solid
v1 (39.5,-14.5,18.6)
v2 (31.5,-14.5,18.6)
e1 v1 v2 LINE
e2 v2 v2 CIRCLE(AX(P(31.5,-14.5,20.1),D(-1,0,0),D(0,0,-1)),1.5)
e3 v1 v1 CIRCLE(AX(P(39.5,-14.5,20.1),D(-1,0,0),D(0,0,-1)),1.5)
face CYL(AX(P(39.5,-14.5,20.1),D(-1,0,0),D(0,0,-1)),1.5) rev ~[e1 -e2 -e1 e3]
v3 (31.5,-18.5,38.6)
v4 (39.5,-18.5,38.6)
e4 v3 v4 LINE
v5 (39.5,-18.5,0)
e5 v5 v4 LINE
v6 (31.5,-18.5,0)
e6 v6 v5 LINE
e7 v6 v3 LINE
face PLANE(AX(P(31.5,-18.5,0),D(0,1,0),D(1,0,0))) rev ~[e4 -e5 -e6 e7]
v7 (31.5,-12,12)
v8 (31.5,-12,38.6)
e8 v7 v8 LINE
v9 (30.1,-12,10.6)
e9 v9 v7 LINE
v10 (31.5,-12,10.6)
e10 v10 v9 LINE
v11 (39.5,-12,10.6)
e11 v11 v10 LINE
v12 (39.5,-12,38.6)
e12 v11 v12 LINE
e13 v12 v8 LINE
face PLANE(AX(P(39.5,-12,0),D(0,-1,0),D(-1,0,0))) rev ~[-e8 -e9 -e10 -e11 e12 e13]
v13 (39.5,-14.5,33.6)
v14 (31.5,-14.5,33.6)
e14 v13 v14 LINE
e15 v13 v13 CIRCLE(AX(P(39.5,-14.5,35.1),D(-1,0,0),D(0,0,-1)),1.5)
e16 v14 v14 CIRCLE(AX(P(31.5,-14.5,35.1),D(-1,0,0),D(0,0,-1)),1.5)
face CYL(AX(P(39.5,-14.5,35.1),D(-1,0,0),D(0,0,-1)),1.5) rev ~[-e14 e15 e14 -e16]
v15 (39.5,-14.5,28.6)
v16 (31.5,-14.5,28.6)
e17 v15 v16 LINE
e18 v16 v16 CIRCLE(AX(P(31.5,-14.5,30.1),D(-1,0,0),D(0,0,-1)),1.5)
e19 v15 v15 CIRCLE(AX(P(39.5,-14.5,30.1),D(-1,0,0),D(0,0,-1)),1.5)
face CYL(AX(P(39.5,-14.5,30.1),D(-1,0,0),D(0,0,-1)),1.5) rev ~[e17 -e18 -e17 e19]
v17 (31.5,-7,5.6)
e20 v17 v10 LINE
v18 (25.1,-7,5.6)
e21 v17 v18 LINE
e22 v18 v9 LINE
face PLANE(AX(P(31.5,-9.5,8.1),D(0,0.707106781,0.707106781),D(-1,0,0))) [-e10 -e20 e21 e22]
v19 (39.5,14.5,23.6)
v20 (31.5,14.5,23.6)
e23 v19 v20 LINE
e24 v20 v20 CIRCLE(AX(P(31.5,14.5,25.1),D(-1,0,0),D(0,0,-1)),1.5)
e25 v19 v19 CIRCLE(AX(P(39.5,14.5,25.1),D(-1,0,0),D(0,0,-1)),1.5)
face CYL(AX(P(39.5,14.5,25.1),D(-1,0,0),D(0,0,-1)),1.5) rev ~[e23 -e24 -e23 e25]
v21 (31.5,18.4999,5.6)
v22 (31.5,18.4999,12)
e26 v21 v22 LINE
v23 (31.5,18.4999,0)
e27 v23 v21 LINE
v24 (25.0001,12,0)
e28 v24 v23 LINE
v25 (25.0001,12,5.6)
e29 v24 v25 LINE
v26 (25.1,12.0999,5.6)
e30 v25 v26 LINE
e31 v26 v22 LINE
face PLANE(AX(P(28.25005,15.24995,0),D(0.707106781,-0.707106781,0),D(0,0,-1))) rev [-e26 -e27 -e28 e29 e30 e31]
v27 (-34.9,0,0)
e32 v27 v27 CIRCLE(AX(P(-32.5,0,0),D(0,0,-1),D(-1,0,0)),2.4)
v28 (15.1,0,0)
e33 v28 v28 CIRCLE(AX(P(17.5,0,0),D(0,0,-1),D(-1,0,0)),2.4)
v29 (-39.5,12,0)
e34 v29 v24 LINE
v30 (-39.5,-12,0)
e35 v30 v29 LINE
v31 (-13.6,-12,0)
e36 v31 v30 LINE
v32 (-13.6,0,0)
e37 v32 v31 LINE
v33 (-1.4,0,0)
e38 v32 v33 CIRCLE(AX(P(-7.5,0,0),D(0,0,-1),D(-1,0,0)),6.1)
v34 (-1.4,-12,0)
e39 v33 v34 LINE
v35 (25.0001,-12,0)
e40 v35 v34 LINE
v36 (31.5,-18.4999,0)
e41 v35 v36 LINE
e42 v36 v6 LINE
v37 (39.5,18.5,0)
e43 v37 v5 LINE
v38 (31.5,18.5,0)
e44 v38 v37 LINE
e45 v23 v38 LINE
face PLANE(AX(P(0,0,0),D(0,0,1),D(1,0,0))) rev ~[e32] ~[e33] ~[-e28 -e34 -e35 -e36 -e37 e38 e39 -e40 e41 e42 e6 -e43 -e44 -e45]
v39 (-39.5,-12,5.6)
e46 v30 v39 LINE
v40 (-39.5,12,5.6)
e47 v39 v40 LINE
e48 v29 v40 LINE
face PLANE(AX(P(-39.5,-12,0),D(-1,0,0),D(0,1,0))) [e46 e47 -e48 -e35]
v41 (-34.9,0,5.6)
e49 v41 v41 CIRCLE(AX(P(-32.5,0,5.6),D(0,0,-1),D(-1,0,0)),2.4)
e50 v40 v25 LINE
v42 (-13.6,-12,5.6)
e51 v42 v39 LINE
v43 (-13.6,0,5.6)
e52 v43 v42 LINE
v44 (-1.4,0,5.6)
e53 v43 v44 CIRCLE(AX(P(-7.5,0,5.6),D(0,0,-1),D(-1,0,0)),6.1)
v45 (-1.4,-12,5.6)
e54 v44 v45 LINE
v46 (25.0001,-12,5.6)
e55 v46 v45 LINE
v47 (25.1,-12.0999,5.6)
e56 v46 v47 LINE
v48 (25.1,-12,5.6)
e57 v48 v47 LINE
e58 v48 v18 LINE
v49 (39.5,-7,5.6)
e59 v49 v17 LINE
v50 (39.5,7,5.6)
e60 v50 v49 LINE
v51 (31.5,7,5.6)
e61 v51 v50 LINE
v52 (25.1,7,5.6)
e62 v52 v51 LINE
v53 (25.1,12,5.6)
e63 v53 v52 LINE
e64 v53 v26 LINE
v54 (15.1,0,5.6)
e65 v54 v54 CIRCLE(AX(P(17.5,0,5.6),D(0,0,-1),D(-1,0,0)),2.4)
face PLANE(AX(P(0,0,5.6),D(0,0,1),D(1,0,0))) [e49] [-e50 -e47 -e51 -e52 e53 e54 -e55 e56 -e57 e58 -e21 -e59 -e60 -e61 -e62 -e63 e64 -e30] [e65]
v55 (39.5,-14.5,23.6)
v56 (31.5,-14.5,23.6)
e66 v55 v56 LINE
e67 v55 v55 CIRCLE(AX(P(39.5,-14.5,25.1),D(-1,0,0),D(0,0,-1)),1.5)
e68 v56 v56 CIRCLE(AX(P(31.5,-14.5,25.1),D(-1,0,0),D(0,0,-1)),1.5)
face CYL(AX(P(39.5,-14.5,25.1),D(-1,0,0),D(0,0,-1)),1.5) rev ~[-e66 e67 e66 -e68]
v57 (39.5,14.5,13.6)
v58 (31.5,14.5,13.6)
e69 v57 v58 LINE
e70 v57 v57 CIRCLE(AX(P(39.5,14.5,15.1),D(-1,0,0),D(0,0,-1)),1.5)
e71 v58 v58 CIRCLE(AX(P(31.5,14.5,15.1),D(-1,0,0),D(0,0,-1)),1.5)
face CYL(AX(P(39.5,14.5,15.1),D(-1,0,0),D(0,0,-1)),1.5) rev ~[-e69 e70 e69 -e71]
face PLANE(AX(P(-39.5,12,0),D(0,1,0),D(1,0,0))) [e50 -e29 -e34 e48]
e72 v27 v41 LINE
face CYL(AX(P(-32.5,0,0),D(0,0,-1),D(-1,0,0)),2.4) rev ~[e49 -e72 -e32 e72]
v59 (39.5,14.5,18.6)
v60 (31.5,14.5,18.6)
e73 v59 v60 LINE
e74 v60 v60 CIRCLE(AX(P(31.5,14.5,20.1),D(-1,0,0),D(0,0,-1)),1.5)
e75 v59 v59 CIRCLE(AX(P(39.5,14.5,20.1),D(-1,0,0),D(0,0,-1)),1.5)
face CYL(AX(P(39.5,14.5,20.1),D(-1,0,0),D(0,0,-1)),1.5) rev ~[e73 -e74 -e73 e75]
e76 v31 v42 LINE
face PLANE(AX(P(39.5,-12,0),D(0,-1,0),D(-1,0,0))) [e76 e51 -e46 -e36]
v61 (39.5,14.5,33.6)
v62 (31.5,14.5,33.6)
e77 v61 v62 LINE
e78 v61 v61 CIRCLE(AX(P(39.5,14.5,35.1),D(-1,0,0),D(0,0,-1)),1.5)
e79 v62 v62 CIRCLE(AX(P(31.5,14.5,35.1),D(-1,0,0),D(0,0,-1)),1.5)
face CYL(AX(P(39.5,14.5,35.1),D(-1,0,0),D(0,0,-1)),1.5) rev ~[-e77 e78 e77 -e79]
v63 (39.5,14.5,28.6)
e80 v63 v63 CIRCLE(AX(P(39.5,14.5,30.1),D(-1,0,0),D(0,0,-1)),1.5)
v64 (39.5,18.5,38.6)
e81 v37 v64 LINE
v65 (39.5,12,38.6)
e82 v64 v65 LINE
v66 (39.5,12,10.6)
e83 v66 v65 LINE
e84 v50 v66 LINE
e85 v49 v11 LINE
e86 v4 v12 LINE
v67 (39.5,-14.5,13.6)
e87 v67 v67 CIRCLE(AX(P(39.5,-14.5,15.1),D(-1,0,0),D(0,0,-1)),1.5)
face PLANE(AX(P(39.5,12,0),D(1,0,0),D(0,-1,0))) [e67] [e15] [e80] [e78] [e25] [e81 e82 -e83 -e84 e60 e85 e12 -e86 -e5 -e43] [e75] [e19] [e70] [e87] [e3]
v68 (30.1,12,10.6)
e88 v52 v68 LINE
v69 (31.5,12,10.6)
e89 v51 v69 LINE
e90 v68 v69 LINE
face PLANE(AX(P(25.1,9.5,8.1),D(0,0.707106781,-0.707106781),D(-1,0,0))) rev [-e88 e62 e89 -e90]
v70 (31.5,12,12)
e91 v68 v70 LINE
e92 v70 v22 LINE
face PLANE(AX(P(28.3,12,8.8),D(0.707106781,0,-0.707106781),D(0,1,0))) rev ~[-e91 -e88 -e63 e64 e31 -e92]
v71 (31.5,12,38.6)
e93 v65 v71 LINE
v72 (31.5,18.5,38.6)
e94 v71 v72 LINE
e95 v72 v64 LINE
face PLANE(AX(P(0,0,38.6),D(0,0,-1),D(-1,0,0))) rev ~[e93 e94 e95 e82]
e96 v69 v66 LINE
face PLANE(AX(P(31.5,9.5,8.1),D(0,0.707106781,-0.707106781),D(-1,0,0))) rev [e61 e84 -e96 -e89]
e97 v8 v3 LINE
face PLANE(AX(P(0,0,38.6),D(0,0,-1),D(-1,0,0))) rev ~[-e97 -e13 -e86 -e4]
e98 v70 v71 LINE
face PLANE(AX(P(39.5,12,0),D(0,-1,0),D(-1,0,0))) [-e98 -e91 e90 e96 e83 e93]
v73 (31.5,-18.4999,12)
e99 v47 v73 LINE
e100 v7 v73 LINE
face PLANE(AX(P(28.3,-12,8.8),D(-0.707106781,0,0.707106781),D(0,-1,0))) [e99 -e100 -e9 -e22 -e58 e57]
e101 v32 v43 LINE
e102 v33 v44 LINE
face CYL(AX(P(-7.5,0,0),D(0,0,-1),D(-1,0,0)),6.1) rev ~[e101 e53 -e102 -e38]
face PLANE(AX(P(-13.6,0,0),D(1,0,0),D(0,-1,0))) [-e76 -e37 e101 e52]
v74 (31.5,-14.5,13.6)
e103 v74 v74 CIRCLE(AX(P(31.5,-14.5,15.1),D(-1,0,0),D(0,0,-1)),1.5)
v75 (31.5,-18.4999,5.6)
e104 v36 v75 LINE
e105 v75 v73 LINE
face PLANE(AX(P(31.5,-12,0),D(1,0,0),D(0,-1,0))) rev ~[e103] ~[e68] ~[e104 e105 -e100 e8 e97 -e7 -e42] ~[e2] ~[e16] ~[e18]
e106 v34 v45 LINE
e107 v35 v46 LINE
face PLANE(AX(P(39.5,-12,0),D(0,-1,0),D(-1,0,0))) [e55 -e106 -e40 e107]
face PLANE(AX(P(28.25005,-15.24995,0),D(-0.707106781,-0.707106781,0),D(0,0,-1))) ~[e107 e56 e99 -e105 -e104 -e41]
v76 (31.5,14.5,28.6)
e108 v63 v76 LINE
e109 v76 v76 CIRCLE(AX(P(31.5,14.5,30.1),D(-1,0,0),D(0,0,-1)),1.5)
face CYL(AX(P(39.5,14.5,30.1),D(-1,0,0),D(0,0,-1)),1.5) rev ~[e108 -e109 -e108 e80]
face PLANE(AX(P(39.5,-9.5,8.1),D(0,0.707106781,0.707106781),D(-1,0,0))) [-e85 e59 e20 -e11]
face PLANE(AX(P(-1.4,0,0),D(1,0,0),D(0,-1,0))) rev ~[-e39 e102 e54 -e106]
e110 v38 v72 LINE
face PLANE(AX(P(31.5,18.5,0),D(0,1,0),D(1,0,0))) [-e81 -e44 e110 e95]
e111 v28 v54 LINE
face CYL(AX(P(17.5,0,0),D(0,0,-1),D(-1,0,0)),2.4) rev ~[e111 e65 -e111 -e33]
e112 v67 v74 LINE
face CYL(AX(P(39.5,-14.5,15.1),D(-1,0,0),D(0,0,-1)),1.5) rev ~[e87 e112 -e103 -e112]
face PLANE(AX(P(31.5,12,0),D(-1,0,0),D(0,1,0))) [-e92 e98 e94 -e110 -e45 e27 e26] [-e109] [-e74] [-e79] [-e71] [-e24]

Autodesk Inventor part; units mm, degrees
ref_plane "YZ Plane" through (0, 0, 0) normal (1, 0, 0) x (0, 1, 0)
ref_plane "XZ Plane" through (0, 0, 0) normal (0, 1, 0) x (-1, 0, 0)
ref_plane "XY Plane" through (0, 0, 0) normal (0, 0, 1) x (1, 0, 0)
sketch "Sketch1" plane through (0, 0, 0) normal (0, 0, 1) x (1, 0, 0)
  line L0 (-39.5, 12) -> (39.5, 12)
  line L1 (39.5, 12) -> (39.5, -12)
  line L2 (39.5, -12) -> (-39.5, -12)
  line L3 (-39.5, -12) -> (-39.5, 12)
  line L4 (-39.5, 12) -> (39.5, -12) construction
  line L5 (39.5, 12) -> (-39.5, -12) construction
  point P0 (0, 0)
  dimension "d0" = 79
  dimension "d1" = 24
extrude "Extrusion1" add sketch "Sketch1" along normal blind 5.6
sketch "Sketch3" plane through (0, 0, 0) normal (0, 0, -1) x (-1, 0, 0)
  line L0 (-39.5, 12) -> (-31.5, 12)
  line L1 (-31.5, 12) -> (-31.5, 18.5)
  line L2 (-31.5, 18.5) -> (-39.5, 18.5)
  line L3 (-39.5, 18.5) -> (-39.5, 12)
  line L4 (-39.5, -12) -> (-31.5, -12)
  line L5 (-31.5, -12) -> (-31.5, -18.5)
  line L6 (-31.5, -18.5) -> (-39.5, -18.5)
  line L7 (-39.5, -18.5) -> (-39.5, -12)
  point P0 (0, 0)
  dimension "d8" = 8
  dimension "d9" = 6.5
  dimension "d10" = 6.5
extrude "Extrusion2" add sketch "Sketch3" against normal blind 38.6
chamfer "Chamfer1" distance 6.5 angle 45 2 edges at (31.5, -12, 2.8) (31.5, 12, 2.8)
sketch "Sketch5" plane through (0, 0, 0) normal (0, 0, -1) x (-1, 0, 0)
  line L0 (-25, -12) -> (39.5, -12) projected
  line L1 (39.5, 12) -> (-24.5, 12) construction
  line L2 (-24.5, 12) -> (-24.5, -12) construction
  line L3 (-24.5, -12) -> (39.5, -12) construction
  line L4 (39.5, -12) -> (39.5, 12) construction
  line L5 (-24.5, 12) -> (39.5, -12) construction
  line L6 (39.5, 12) -> (-24.5, -12) construction
  circle A0 centre (7.5, 0) radius 6.1
  line L7 (-17.5, 3) -> (32.5, 3) construction
  line L8 (32.5, 3) -> (32.5, -3) construction
  line L9 (32.5, -3) -> (-17.5, -3) construction
  line L10 (-17.5, -3) -> (-17.5, 3) construction
  line L11 (-17.5, 3) -> (32.5, -3) construction
  line L12 (32.5, 3) -> (-17.5, -3) construction
  circle A1 centre (-17.5, 0) radius 2.4
  circle A2 centre (32.5, 0) radius 2.4
  line L13 (1.4, 0) -> (1.4, -12)
  line L14 (13.6, 0) -> (13.6, -12)
  line L15 (13.6, -12) -> (1.4, -12)
  point P0 (0, 0)
  dimension "d29" = 64
  dimension "d30" = 12.2
  dimension "d31" = 50
  dimension "d32" = 4.8
  dimension "d33" = 4.8
extrude "Extrusion4" cut sketch "Sketch5" against normal blind 5.6
sketch "Sketch6" plane through (39.5, -18.5, 0) normal (1, 0, 0) x (0, 0, -1)
  line L0 (-38.6, 6.5) -> (-5.6, 6.5) construction
  line L1 (-5.6, 6.5) -> (-5.6, 1.5) construction
  line L2 (-5.6, 1.5) -> (-38.6, 1.5) construction
  line L3 (-38.6, 1.5) -> (-38.6, 6.5) construction
  line L4 (-38.6, 30.5) -> (-5.6, 30.5) construction
  line L5 (-5.6, 30.5) -> (-5.6, 35.5) construction
  line L6 (-5.6, 35.5) -> (-38.6, 35.5) construction
  line L7 (-38.6, 35.5) -> (-38.6, 30.5) construction
  line L8 (-38.6, 4) -> (-5.6, 4) construction
  line L9 (-38.6, 33) -> (-5.6, 33) construction
  line L10 (-38.6, 1.5) -> (-37.6, 1.5) construction
  line L11 (-37.6, 1.5) -> (-37.6, 6.5) construction
  line L12 (-37.6, 6.5) -> (-38.6, 6.5) construction
  line L13 (-38.6, 6.5) -> (-38.6, 1.5) construction
  line L14 (-37.6, 1.5) -> (-32.6, 1.5) construction
  line L15 (-32.6, 1.5) -> (-32.6, 6.5) construction
  line L16 (-32.6, 6.5) -> (-37.6, 6.5) construction
  line L17 (-37.6, 6.5) -> (-37.6, 1.5) construction
  line L18 (-38.6, 30.5) -> (-37.6, 30.5) construction
  line L19 (-37.6, 30.5) -> (-37.6, 35.5) construction
  line L20 (-37.6, 35.5) -> (-38.6, 35.5) construction
  line L21 (-38.6, 35.5) -> (-38.6, 30.5) construction
  line L22 (-37.6, 30.5) -> (-32.6, 30.5) construction
  line L23 (-32.6, 30.5) -> (-32.6, 35.5) construction
  line L24 (-32.6, 35.5) -> (-37.6, 35.5) construction
  line L25 (-37.6, 35.5) -> (-37.6, 30.5) construction
  line L26 (-37.6, 1.5) -> (-32.6, 6.5) construction
  line L27 (-37.6, 6.5) -> (-32.6, 1.5) construction
  line L28 (-37.6, 30.5) -> (-32.6, 35.5) construction
  line L29 (-37.6, 35.5) -> (-32.6, 30.5) construction
  line L30 (-38.6, 35.5) -> (-37.6, 35.5) construction
  line L31 (-37.6, 35.5) -> (-37.6, 30.5) construction
  line L32 (-37.6, 30.5) -> (-38.6, 30.5) construction
  line L33 (-38.6, 30.5) -> (-38.6, 35.5) construction
  line L34 (-5.6, 30.5) -> (-38.6, 30.5) projected
  line L35 (-32.6, 35.5) -> (-27.6, 35.5) construction
  line L36 (-27.6, 35.5) -> (-27.6, 30.5) construction
  line L37 (-27.6, 30.5) -> (-32.6, 30.5) construction
  line L38 (-32.6, 30.5) -> (-32.6, 35.5) construction
  line L39 (-27.6, 35.5) -> (-22.6, 35.5) construction
  line L40 (-22.6, 35.5) -> (-22.6, 30.5) construction
  line L41 (-22.6, 30.5) -> (-27.6, 30.5) construction
  line L42 (-27.6, 30.5) -> (-27.6, 35.5) construction
  line L43 (-32.6, 6.5) -> (-27.6, 6.5) construction
  line L44 (-27.6, 6.5) -> (-27.6, 1.5) construction
  line L45 (-27.6, 1.5) -> (-32.6, 1.5) construction
  line L46 (-32.6, 1.5) -> (-32.6, 6.5) construction
  line L47 (-27.6, 6.5) -> (-22.6, 6.5) construction
  line L48 (-22.6, 6.5) -> (-22.6, 1.5) construction
  line L49 (-22.6, 1.5) -> (-27.6, 1.5) construction
  line L50 (-27.6, 1.5) -> (-27.6, 6.5) construction
  line L51 (-22.6, 35.5) -> (-17.6, 35.5) construction
  line L52 (-17.6, 35.5) -> (-17.6, 30.5) construction
  line L53 (-17.6, 30.5) -> (-22.6, 30.5) construction
  line L54 (-22.6, 30.5) -> (-22.6, 35.5) construction
  line L55 (-22.6, 6.5) -> (-17.6, 6.5) construction
  line L56 (-17.6, 6.5) -> (-17.6, 1.5) construction
  line L57 (-17.6, 1.5) -> (-22.6, 1.5) construction
  line L58 (-22.6, 1.5) -> (-22.6, 6.5) construction
  line L59 (-17.6, 35.5) -> (-12.6, 35.5) construction
  line L60 (-12.6, 35.5) -> (-12.6, 30.5) construction
  line L61 (-12.6, 30.5) -> (-17.6, 30.5) construction
  line L62 (-17.6, 30.5) -> (-17.6, 35.5) construction
  line L63 (-17.6, 6.5) -> (-12.6, 6.5) construction
  line L64 (-12.6, 6.5) -> (-12.6, 1.5) construction
  line L65 (-12.6, 1.5) -> (-17.6, 1.5) construction
  line L66 (-17.6, 1.5) -> (-17.6, 6.5) construction
  line L67 (-32.6, 35.5) -> (-27.6, 30.5) construction
  line L68 (-27.6, 35.5) -> (-32.6, 30.5) construction
  line L69 (-27.6, 35.5) -> (-22.6, 30.5) construction
  line L70 (-27.6, 30.5) -> (-22.6, 35.5) construction
  line L71 (-22.6, 30.5) -> (-17.6, 35.5) construction
  line L72 (-22.6, 35.5) -> (-17.6, 30.5) construction
  line L73 (-17.6, 35.5) -> (-12.6, 30.5) construction
  line L74 (-12.6, 35.5) -> (-17.6, 30.5) construction
  line L75 (-17.6, 6.5) -> (-12.6, 1.5) construction
  line L76 (-12.6, 6.5) -> (-17.6, 1.5) construction
  line L77 (-22.6, 6.5) -> (-17.6, 1.5) construction
  line L78 (-17.6, 6.5) -> (-22.6, 1.5) construction
  line L79 (-27.6, 6.5) -> (-22.6, 1.5) construction
  line L80 (-22.6, 6.5) -> (-27.6, 1.5) construction
  line L81 (-32.6, 6.5) -> (-27.6, 1.5) construction
  line L82 (-27.6, 6.5) -> (-32.6, 1.5) construction
  point P0 (0, 18.5)
  point P1 (-35.1, 4)
  point P2 (-35.1, 33)
  point P3 (-30.1, 33)
  point P4 (-25.1, 33)
  point P5 (-20.1, 33)
  point P6 (-15.1, 33)
  point P7 (-15.1, 4)
  point P8 (-20.1, 4)
  point P9 (-25.1, 4)
  point P10 (-30.1, 4)
  dimension "d42" = 5
  dimension "d43" = 5
  dimension "d44" = 1
  dimension "d45" = 5
  dimension "d46" = 5
  dimension "d54" = 33
  dimension "d55" = 1
  dimension "d59" = 5
  dimension "d60" = 5
  dimension "d61" = 5
  dimension "d62" = 5
hole "Hole2" at (39.5, -14.5, 35.1) at (39.5, 14.5, 35.1) at (39.5, 14.5, 30.1) at (39.5, 14.5, 25.1) at (39.5, 14.5, 20.1) at (39.5, 14.5, 15.1) at (39.5, -14.5, 15.1) at (39.5, -14.5, 20.1) at (39.5, -14.5, 25.1) at (39.5, -14.5, 30.1) direction (-1, 0, 0) diameter 3 end through all
chamfer "Chamfer2" distance 6.4 angle 45 2 edges at (31.5, 15.25, 5.6) (31.5, -15.25, 5.6)
chamfer "Chamfer3" distance 5 angle 45 2 edges at (35.5, 12, 5.6) (35.5, -12, 5.6)
properties part number "Servo-Groove-Mount-E3D"
